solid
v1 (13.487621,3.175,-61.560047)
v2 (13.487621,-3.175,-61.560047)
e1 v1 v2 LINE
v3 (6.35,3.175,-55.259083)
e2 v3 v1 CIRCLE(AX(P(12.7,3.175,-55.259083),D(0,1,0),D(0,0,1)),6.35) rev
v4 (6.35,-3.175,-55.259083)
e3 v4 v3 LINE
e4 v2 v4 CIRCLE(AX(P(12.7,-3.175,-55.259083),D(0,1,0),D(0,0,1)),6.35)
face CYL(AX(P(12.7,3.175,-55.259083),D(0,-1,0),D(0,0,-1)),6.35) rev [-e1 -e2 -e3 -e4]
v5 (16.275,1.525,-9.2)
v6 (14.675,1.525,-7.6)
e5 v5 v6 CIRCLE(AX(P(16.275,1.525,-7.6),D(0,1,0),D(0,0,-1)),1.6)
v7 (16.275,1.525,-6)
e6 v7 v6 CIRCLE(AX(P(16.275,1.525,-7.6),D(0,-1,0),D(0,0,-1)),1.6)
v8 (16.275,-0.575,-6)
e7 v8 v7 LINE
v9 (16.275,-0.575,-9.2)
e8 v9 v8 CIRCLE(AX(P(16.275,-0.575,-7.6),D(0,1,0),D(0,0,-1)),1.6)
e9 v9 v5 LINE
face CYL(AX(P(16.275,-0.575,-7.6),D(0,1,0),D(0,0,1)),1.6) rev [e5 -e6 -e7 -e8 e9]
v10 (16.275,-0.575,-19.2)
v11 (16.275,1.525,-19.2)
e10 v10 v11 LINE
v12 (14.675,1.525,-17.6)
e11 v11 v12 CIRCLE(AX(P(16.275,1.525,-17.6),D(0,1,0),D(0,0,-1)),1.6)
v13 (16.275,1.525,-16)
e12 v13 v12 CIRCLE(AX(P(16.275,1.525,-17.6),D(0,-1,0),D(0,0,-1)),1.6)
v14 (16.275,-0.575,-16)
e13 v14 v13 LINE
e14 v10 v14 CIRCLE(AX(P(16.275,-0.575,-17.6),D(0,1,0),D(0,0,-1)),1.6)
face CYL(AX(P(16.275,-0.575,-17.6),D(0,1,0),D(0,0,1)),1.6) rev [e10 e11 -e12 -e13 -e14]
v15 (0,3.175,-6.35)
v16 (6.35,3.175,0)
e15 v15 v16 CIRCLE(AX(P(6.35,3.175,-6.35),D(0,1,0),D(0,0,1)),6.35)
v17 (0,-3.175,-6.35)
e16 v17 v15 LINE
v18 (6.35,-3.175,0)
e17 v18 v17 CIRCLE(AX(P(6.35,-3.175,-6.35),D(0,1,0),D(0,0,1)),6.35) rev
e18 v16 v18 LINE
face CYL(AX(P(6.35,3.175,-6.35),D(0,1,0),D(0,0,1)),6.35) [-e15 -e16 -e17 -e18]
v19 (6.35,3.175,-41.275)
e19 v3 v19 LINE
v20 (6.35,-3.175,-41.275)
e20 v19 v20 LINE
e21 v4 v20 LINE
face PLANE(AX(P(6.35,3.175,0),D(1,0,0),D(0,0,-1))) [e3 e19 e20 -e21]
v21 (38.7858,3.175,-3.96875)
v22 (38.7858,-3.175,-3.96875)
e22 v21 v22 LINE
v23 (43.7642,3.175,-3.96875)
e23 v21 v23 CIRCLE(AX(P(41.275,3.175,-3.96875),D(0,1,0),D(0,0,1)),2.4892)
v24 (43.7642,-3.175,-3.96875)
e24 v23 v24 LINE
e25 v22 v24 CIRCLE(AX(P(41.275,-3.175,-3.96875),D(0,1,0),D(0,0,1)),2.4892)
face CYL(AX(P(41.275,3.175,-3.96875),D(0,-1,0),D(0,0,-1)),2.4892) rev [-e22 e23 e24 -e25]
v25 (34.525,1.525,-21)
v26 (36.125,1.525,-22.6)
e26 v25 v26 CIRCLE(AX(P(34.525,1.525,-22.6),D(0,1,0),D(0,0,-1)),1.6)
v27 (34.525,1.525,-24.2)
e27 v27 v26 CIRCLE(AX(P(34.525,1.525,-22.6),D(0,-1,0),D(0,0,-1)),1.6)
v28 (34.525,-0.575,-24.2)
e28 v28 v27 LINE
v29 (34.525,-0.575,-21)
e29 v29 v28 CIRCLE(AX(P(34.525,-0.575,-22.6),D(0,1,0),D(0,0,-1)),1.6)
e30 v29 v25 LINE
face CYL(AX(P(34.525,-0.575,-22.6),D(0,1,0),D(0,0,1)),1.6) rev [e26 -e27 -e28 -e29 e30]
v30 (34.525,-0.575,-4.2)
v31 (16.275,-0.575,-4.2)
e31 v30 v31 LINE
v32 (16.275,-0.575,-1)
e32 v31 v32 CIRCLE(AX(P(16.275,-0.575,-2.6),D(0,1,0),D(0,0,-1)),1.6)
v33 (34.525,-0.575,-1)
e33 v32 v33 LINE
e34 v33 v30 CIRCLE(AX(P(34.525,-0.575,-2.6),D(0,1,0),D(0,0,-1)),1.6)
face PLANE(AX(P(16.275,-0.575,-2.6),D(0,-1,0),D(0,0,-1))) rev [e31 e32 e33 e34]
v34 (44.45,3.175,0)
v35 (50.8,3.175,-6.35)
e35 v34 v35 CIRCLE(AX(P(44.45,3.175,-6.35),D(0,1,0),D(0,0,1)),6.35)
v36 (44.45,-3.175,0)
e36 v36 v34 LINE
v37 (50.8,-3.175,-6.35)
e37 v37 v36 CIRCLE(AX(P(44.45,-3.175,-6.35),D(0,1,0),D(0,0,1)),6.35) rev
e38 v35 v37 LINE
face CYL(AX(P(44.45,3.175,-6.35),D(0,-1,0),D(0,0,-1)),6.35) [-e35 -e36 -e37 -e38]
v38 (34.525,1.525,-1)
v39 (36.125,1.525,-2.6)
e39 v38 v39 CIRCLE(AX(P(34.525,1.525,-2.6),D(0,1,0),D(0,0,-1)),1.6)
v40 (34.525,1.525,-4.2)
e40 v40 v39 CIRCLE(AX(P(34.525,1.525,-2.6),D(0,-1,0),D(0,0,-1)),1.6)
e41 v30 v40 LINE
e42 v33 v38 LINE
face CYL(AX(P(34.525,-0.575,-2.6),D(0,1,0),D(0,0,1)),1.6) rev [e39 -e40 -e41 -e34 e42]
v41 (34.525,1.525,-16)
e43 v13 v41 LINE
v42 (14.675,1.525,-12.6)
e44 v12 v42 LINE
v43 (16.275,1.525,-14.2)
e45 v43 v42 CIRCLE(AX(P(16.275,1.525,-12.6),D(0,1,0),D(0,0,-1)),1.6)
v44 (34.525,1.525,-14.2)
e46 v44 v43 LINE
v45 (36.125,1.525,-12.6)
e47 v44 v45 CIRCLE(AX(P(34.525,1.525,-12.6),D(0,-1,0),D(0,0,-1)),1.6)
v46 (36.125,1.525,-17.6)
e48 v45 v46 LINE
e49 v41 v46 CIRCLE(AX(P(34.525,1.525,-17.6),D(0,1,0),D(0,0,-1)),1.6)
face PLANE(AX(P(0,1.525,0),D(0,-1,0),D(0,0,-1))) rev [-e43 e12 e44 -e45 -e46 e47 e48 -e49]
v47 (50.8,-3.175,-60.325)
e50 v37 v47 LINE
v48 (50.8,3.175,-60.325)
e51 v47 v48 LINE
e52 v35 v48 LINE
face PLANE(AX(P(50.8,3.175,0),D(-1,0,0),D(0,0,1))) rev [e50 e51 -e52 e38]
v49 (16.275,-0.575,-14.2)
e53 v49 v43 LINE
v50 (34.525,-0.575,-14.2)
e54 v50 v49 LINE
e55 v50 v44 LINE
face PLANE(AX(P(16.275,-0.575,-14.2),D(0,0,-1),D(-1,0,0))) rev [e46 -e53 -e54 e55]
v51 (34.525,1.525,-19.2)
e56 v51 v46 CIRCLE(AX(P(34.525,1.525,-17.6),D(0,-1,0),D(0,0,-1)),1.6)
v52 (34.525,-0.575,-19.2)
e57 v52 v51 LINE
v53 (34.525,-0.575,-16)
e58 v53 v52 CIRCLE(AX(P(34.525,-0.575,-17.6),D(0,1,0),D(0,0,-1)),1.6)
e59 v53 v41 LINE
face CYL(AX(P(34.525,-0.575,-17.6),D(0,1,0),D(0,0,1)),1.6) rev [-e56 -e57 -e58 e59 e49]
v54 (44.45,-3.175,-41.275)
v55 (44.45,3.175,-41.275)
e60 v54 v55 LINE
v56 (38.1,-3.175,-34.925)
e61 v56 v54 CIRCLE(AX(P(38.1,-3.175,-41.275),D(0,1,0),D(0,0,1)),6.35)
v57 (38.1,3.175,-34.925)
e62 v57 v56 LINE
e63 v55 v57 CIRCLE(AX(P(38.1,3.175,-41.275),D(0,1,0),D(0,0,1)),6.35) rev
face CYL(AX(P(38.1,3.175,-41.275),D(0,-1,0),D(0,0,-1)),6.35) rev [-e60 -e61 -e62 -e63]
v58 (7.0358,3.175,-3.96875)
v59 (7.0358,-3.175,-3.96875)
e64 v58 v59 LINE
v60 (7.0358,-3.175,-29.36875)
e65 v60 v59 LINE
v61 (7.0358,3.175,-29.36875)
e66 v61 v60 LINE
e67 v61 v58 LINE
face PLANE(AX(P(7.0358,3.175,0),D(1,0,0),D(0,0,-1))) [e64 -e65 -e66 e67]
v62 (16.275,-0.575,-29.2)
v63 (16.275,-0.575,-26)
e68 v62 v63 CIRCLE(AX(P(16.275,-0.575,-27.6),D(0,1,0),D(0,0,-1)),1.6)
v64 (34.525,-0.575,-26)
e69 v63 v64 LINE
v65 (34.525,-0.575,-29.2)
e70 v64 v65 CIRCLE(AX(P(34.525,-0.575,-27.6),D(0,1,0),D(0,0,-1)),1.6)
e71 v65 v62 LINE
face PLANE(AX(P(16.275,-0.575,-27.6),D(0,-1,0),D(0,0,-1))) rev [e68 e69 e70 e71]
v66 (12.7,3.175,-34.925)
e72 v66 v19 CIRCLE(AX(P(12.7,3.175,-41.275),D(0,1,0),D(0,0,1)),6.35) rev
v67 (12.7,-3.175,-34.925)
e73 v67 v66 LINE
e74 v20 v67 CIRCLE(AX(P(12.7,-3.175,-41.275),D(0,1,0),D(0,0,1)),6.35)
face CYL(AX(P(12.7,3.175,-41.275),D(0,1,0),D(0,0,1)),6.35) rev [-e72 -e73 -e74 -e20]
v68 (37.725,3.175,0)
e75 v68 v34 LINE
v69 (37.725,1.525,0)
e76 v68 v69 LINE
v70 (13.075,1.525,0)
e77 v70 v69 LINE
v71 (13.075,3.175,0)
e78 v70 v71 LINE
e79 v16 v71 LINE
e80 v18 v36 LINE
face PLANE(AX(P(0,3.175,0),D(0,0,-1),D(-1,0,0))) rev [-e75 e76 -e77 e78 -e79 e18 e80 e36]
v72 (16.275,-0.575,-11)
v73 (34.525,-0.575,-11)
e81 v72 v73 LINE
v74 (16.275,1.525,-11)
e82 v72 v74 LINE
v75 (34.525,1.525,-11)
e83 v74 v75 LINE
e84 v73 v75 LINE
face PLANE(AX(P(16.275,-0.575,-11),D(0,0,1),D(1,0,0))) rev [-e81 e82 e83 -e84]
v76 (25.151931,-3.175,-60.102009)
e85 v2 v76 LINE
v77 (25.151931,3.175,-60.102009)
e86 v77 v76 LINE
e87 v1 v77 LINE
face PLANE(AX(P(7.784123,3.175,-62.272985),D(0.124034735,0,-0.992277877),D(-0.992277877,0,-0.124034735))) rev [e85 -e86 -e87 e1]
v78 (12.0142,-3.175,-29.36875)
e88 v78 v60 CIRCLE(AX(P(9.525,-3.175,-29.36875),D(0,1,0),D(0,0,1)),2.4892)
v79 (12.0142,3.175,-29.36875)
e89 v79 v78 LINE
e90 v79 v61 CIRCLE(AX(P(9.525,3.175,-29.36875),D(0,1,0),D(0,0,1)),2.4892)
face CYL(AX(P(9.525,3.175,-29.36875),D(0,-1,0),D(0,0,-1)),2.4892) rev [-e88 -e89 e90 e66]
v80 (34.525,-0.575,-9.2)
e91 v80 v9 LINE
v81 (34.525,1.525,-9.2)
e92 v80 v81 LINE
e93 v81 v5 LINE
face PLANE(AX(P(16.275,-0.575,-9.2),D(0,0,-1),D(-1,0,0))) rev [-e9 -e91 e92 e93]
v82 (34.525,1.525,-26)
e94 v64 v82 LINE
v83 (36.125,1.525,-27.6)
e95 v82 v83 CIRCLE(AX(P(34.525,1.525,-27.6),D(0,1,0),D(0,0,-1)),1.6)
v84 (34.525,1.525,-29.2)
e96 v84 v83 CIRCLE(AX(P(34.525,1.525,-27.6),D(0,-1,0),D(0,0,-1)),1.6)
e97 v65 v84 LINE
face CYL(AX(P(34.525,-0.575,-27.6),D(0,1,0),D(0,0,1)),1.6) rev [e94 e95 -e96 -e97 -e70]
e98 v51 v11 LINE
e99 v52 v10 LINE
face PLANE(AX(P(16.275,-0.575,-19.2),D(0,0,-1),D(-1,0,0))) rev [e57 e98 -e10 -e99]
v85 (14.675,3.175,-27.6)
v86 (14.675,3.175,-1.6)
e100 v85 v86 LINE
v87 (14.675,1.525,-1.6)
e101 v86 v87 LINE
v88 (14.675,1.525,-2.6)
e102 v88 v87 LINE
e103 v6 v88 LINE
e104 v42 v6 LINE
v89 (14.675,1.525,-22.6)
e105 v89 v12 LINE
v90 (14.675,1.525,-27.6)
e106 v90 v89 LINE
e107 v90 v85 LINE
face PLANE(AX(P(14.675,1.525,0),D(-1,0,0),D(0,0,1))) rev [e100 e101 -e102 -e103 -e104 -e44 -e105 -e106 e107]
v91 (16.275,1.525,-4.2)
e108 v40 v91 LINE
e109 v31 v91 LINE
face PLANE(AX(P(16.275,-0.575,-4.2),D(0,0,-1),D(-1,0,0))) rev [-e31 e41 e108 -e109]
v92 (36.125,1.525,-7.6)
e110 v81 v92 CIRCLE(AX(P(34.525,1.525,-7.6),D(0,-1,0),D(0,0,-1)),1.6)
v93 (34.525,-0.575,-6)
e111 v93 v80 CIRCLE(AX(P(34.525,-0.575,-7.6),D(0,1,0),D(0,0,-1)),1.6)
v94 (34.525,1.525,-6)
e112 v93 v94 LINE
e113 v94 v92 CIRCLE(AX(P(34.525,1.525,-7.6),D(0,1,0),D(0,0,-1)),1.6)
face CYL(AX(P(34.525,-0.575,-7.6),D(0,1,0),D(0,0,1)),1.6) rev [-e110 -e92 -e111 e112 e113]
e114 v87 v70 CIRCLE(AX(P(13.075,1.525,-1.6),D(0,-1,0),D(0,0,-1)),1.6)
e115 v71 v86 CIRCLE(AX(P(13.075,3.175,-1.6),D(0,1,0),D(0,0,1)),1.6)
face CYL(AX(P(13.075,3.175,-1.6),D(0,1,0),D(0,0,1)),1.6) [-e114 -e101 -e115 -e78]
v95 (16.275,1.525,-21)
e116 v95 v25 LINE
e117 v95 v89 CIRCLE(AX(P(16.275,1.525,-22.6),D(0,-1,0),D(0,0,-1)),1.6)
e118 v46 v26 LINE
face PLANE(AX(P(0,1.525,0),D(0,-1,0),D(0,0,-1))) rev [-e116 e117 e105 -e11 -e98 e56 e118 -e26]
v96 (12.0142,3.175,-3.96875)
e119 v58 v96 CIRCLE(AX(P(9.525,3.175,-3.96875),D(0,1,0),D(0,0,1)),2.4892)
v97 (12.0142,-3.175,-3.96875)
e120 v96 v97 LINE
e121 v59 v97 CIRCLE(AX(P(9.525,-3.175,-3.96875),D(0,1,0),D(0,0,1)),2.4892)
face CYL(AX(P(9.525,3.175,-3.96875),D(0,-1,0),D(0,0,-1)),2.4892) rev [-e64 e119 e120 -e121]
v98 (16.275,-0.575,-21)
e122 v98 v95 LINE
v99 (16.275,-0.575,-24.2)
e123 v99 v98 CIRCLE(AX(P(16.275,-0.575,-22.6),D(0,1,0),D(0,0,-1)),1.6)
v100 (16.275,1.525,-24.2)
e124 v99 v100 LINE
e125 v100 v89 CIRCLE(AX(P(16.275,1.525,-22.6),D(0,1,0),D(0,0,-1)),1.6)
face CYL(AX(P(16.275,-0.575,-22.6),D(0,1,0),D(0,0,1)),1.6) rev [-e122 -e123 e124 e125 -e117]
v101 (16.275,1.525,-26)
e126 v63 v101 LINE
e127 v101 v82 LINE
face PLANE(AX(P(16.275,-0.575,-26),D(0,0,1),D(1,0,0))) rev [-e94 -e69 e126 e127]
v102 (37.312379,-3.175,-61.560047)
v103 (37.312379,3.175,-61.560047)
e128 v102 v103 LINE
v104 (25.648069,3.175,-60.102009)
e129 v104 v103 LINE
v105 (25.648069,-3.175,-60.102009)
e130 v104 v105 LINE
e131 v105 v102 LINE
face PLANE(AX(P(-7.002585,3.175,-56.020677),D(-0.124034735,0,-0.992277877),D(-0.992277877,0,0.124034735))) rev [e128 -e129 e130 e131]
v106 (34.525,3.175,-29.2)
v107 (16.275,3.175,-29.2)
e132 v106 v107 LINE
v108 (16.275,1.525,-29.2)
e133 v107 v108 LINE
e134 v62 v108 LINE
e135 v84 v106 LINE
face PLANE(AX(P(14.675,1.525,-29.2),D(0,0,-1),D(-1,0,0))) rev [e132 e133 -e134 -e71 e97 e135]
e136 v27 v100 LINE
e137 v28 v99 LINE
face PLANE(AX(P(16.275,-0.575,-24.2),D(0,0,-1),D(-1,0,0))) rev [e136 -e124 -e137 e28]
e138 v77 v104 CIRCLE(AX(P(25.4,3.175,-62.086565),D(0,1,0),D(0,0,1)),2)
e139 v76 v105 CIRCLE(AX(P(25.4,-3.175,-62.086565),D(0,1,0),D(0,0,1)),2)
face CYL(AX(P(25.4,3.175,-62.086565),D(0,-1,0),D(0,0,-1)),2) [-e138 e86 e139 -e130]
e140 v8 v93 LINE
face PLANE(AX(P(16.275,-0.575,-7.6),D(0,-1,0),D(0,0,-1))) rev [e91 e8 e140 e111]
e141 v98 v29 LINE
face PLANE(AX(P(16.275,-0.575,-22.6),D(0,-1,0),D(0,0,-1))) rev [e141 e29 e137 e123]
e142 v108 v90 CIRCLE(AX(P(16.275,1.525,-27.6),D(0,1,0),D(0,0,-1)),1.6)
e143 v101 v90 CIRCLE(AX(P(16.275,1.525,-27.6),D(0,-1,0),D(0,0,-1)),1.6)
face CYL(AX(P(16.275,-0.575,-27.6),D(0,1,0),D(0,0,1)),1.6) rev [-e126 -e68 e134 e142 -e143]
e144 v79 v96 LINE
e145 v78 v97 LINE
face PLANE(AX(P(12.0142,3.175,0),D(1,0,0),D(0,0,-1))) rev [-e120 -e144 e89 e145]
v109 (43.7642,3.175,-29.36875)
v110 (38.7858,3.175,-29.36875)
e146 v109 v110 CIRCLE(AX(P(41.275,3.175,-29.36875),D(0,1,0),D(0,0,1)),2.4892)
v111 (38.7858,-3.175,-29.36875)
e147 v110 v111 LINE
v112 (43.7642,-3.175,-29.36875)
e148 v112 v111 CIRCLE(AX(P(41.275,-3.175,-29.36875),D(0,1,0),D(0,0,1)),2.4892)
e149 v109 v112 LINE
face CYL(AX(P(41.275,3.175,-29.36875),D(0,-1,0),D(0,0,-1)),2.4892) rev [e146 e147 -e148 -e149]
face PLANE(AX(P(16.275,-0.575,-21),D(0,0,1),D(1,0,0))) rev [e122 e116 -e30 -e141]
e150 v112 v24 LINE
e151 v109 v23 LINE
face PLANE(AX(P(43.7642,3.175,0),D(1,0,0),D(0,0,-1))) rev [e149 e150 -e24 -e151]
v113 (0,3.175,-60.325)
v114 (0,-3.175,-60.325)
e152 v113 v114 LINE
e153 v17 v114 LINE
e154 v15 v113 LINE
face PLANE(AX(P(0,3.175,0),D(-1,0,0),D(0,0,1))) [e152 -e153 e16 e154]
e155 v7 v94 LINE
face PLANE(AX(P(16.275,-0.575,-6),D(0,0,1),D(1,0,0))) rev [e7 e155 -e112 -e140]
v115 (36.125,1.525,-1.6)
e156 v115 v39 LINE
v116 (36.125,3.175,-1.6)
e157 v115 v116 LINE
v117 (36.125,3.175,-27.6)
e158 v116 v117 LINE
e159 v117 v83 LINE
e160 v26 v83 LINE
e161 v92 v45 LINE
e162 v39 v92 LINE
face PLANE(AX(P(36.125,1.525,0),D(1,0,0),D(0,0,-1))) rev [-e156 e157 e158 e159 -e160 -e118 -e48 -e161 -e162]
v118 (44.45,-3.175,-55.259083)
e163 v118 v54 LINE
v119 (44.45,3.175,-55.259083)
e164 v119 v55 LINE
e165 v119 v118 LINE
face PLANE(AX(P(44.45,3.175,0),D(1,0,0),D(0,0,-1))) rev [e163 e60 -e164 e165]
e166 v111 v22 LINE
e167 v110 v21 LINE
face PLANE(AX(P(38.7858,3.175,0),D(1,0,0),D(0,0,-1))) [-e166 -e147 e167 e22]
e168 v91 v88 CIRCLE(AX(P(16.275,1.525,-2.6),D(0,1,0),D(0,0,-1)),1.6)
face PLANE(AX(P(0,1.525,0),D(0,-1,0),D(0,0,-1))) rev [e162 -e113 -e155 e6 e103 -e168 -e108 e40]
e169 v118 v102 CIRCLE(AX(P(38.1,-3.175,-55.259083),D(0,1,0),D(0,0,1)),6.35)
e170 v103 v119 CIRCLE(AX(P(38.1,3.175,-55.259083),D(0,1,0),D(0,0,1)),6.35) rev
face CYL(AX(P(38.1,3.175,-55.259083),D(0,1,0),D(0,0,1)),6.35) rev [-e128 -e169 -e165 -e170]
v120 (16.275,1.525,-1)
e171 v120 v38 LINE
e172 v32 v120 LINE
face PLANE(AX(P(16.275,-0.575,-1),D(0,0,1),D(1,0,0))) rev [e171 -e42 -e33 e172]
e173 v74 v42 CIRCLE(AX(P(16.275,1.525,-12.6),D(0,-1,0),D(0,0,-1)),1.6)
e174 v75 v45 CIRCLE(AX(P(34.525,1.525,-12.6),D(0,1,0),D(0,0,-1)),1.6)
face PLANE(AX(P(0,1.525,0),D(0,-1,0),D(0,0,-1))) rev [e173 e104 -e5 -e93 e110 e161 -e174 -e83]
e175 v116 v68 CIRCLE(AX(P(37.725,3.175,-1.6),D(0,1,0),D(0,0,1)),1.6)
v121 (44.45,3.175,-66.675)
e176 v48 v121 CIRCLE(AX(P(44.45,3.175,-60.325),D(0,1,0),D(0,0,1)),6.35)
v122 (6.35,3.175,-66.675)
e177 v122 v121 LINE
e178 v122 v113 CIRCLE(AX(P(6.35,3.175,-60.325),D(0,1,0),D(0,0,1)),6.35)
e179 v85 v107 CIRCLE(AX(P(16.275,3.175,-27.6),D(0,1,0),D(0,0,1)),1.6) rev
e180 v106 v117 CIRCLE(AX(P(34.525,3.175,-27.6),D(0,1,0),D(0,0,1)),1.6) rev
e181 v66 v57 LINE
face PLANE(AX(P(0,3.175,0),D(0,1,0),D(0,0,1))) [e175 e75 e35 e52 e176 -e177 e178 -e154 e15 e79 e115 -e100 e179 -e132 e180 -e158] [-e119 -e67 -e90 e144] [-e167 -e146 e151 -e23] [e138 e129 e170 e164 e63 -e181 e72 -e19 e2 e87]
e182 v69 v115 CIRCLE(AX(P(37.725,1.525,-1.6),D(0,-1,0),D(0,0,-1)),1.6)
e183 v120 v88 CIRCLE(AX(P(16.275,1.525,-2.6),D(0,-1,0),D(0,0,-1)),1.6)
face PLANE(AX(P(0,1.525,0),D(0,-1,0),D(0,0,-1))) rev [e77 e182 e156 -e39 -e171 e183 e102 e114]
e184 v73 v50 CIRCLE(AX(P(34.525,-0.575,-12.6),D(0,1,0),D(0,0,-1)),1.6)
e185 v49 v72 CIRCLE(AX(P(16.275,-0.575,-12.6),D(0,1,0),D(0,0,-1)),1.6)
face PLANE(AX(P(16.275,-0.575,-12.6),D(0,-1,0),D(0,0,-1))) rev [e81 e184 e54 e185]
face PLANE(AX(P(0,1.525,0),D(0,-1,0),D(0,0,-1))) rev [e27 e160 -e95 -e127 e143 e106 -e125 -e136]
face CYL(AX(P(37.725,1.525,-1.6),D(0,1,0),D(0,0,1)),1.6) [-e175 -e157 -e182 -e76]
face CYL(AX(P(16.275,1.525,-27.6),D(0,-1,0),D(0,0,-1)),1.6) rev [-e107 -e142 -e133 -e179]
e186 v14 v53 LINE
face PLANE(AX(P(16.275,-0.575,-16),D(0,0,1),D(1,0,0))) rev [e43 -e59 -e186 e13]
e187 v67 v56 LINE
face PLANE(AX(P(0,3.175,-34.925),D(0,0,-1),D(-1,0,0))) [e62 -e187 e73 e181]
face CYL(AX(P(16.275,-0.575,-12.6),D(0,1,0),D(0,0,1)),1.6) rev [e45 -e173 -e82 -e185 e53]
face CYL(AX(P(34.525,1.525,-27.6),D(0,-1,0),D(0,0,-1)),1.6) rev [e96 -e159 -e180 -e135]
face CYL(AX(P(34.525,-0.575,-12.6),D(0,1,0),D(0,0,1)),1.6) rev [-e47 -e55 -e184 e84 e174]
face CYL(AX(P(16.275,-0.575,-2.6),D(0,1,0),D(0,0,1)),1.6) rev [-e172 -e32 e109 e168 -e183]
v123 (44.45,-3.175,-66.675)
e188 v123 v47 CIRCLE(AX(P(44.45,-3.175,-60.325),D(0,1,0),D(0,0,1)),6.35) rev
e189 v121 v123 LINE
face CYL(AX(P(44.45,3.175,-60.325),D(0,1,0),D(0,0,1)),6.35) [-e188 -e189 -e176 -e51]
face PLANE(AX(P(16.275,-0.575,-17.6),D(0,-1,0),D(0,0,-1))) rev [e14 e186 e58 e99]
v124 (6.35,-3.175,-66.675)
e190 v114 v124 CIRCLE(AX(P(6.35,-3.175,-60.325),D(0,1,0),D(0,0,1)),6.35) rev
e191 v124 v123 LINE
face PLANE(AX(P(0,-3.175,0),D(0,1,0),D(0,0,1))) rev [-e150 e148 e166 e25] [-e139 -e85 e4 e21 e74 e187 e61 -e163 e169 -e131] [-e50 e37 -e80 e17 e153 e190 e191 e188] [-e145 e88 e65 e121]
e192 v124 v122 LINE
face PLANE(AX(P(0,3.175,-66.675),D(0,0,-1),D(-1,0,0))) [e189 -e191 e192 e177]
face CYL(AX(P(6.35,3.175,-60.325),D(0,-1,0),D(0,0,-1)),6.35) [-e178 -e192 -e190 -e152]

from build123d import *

# Parameters (mm, degrees)
SKETCH1_W           = 50.8
SKETCH1_H           = 66.675
BOSS_EXTRUDE1_DEPTH = 3.175
FILLET1_R           = 6.35
SKETCH3_W           = 21.450000026
SKETCH3_H           = 29.20000002
CUT_EXTRUDE2_DEPTH  = 1.650000002
CUT_EXTRUDE1_DEPTH  = 2.100000118
FILLET2_R           = 1.600000102


with BuildPart() as part:
    # Sketch1 → Boss-Extrude1 (new, symmetric)
    with BuildSketch(Plane(origin=(0, 0, 0), x_dir=(1, 0, 0), z_dir=(0, 1, 0))):
        with Locations((25.4, 33.3375)):
            Rectangle(SKETCH1_W, SKETCH1_H)
        with BuildLine():
            ThreePointArc((7.0358, 29.36875), (9.525, 31.85795), (12.0142, 29.36875))
            Line((12.0142, 29.36875), (12.0142, 3.96875))
            ThreePointArc((12.0142, 3.96875), (9.525, 1.47955), (7.0358, 3.96875))
            Line((7.0358, 3.96875), (7.0358, 29.36875))
        make_face(mode=Mode.SUBTRACT)
        with BuildLine():
            ThreePointArc((38.7858, 29.36875), (41.275, 31.85795), (43.7642, 29.36875))
            Line((43.7642, 29.36875), (43.7642, 3.96875))
            ThreePointArc((43.7642, 3.96875), (41.275, 1.47955), (38.7858, 3.96875))
            Line((38.7858, 3.96875), (38.7858, 29.36875))
        make_face(mode=Mode.SUBTRACT)
        with BuildLine():
            Line((6.35, 34.925), (6.35, 62.45225))
            Line((6.35, 62.45225), (25.151930523, 60.102008685))
            ThreePointArc((25.151930523, 60.102008685), (25.4, 60.086564438), (25.648069477, 60.102008685))
            Line((25.648069477, 60.102008685), (44.45, 62.45225))
            Line((44.45, 62.45225), (44.45, 34.925))
            Line((44.45, 34.925), (6.35, 34.925))
        make_face(mode=Mode.SUBTRACT)
    extrude(amount=BOSS_EXTRUDE1_DEPTH, both=True)

    # Fillet1
    fillet1_edges = [part.edges().sort_by_distance(p)[0] for p in [
        (6.35, 0, -62.45225),
        (6.35, 0, -34.925),
        (44.45, 0, -34.925),
        (44.45, 0, -62.45225),
        (0, 0, 0),
        (0, 0, -66.675),
        (50.8, 0, -66.675),
        (50.8, 0, 0),
    ]]
    fillet(fillet1_edges, radius=FILLET1_R)

    # Sketch3 → Cut-Extrude2 (cut)
    with BuildSketch(Plane(origin=(0, 3.175, 0), x_dir=(1, 0, 0), z_dir=(0, 1, 0))):
        with Locations((25.4, 14.60000001)):
            Rectangle(SKETCH3_W, SKETCH3_H)
    extrude(amount=-CUT_EXTRUDE2_DEPTH, mode=Mode.SUBTRACT)

    # Sketch2 → Cut-Extrude1 (cut)
    with BuildSketch(Plane(origin=(0, 1.524999998, 0), x_dir=(1, 0, 0), z_dir=(0, 1, 0))):
        with BuildLine():
            Line((16.274999962, 4.199999982), (34.525000038, 4.199999982))
            ThreePointArc((34.525000038, 4.199999982), (36.125000013, 2.600000007), (34.525000038, 1.000000032))
            Line((34.525000038, 1.000000032), (16.274999962, 1.000000032))
            ThreePointArc((16.274999962, 1.000000032), (14.674999987, 2.600000007), (16.274999962, 4.199999982))
        make_face()
        with BuildLine():
            Line((16.274999962, 29.199999512), (34.525000038, 29.199999512))
            ThreePointArc((34.525000038, 29.199999512), (36.125000013, 27.599999537), (34.525000038, 25.999999562))
            Line((34.525000038, 25.999999562), (16.274999962, 25.999999562))
            ThreePointArc((16.274999962, 25.999999562), (14.674999987, 27.599999537), (16.274999962, 29.199999512))
        make_face()
        with BuildLine():
            Line((16.274999962, 9.199999888), (34.525000038, 9.199999888))
            ThreePointArc((34.525000038, 9.199999888), (36.125000013, 7.599999913), (34.525000038, 5.999999938))
            Line((34.525000038, 5.999999938), (16.274999962, 5.999999938))
            ThreePointArc((16.274999962, 5.999999938), (14.674999987, 7.599999913), (16.274999962, 9.199999888))
        make_face()
        with BuildLine():
            Line((16.274999962, 14.199999794), (34.525000038, 14.199999794))
            ThreePointArc((34.525000038, 14.199999794), (36.125000013, 12.599999819), (34.525000038, 10.999999844))
            Line((34.525000038, 10.999999844), (16.274999962, 10.999999844))
            ThreePointArc((16.274999962, 10.999999844), (14.674999987, 12.599999819), (16.274999962, 14.199999794))
        make_face()
        with BuildLine():
            Line((16.274999962, 19.1999997), (34.525000038, 19.1999997))
            ThreePointArc((34.525000038, 19.1999997), (36.125000013, 17.599999725), (34.525000038, 15.99999975))
            Line((34.525000038, 15.99999975), (16.274999962, 15.99999975))
            ThreePointArc((16.274999962, 15.99999975), (14.674999987, 17.599999725), (16.274999962, 19.1999997))
        make_face()
        with BuildLine():
            Line((16.274999962, 24.199999606), (34.525000038, 24.199999606))
            ThreePointArc((34.525000038, 24.199999606), (36.125000013, 22.599999631), (34.525000038, 20.999999656))
            Line((34.525000038, 20.999999656), (16.274999962, 20.999999656))
            ThreePointArc((16.274999962, 20.999999656), (14.674999987, 22.599999631), (16.274999962, 24.199999606))
        make_face()
    extrude(amount=-CUT_EXTRUDE1_DEPTH, mode=Mode.SUBTRACT)

    # Fillet2
    fillet2_edges = [part.edges().sort_by_distance(p)[0] for p in [
        (36.125000013, 2.349999999, -29.20000002),
        (14.674999987, 2.349999999, -29.20000002),
    ]]
    fillet(fillet2_edges, radius=FILLET2_R - 0.0001)  # a hair under: the kernel refuses the full size
    fillet2_2_edges = [part.edges().sort_by_distance(p)[0] for p in [
        (36.125000013, 2.349999999, 0),
        (14.674999987, 2.349999999, 0),
    ]]
    fillet(fillet2_2_edges, radius=FILLET2_R)


solid = part.part
